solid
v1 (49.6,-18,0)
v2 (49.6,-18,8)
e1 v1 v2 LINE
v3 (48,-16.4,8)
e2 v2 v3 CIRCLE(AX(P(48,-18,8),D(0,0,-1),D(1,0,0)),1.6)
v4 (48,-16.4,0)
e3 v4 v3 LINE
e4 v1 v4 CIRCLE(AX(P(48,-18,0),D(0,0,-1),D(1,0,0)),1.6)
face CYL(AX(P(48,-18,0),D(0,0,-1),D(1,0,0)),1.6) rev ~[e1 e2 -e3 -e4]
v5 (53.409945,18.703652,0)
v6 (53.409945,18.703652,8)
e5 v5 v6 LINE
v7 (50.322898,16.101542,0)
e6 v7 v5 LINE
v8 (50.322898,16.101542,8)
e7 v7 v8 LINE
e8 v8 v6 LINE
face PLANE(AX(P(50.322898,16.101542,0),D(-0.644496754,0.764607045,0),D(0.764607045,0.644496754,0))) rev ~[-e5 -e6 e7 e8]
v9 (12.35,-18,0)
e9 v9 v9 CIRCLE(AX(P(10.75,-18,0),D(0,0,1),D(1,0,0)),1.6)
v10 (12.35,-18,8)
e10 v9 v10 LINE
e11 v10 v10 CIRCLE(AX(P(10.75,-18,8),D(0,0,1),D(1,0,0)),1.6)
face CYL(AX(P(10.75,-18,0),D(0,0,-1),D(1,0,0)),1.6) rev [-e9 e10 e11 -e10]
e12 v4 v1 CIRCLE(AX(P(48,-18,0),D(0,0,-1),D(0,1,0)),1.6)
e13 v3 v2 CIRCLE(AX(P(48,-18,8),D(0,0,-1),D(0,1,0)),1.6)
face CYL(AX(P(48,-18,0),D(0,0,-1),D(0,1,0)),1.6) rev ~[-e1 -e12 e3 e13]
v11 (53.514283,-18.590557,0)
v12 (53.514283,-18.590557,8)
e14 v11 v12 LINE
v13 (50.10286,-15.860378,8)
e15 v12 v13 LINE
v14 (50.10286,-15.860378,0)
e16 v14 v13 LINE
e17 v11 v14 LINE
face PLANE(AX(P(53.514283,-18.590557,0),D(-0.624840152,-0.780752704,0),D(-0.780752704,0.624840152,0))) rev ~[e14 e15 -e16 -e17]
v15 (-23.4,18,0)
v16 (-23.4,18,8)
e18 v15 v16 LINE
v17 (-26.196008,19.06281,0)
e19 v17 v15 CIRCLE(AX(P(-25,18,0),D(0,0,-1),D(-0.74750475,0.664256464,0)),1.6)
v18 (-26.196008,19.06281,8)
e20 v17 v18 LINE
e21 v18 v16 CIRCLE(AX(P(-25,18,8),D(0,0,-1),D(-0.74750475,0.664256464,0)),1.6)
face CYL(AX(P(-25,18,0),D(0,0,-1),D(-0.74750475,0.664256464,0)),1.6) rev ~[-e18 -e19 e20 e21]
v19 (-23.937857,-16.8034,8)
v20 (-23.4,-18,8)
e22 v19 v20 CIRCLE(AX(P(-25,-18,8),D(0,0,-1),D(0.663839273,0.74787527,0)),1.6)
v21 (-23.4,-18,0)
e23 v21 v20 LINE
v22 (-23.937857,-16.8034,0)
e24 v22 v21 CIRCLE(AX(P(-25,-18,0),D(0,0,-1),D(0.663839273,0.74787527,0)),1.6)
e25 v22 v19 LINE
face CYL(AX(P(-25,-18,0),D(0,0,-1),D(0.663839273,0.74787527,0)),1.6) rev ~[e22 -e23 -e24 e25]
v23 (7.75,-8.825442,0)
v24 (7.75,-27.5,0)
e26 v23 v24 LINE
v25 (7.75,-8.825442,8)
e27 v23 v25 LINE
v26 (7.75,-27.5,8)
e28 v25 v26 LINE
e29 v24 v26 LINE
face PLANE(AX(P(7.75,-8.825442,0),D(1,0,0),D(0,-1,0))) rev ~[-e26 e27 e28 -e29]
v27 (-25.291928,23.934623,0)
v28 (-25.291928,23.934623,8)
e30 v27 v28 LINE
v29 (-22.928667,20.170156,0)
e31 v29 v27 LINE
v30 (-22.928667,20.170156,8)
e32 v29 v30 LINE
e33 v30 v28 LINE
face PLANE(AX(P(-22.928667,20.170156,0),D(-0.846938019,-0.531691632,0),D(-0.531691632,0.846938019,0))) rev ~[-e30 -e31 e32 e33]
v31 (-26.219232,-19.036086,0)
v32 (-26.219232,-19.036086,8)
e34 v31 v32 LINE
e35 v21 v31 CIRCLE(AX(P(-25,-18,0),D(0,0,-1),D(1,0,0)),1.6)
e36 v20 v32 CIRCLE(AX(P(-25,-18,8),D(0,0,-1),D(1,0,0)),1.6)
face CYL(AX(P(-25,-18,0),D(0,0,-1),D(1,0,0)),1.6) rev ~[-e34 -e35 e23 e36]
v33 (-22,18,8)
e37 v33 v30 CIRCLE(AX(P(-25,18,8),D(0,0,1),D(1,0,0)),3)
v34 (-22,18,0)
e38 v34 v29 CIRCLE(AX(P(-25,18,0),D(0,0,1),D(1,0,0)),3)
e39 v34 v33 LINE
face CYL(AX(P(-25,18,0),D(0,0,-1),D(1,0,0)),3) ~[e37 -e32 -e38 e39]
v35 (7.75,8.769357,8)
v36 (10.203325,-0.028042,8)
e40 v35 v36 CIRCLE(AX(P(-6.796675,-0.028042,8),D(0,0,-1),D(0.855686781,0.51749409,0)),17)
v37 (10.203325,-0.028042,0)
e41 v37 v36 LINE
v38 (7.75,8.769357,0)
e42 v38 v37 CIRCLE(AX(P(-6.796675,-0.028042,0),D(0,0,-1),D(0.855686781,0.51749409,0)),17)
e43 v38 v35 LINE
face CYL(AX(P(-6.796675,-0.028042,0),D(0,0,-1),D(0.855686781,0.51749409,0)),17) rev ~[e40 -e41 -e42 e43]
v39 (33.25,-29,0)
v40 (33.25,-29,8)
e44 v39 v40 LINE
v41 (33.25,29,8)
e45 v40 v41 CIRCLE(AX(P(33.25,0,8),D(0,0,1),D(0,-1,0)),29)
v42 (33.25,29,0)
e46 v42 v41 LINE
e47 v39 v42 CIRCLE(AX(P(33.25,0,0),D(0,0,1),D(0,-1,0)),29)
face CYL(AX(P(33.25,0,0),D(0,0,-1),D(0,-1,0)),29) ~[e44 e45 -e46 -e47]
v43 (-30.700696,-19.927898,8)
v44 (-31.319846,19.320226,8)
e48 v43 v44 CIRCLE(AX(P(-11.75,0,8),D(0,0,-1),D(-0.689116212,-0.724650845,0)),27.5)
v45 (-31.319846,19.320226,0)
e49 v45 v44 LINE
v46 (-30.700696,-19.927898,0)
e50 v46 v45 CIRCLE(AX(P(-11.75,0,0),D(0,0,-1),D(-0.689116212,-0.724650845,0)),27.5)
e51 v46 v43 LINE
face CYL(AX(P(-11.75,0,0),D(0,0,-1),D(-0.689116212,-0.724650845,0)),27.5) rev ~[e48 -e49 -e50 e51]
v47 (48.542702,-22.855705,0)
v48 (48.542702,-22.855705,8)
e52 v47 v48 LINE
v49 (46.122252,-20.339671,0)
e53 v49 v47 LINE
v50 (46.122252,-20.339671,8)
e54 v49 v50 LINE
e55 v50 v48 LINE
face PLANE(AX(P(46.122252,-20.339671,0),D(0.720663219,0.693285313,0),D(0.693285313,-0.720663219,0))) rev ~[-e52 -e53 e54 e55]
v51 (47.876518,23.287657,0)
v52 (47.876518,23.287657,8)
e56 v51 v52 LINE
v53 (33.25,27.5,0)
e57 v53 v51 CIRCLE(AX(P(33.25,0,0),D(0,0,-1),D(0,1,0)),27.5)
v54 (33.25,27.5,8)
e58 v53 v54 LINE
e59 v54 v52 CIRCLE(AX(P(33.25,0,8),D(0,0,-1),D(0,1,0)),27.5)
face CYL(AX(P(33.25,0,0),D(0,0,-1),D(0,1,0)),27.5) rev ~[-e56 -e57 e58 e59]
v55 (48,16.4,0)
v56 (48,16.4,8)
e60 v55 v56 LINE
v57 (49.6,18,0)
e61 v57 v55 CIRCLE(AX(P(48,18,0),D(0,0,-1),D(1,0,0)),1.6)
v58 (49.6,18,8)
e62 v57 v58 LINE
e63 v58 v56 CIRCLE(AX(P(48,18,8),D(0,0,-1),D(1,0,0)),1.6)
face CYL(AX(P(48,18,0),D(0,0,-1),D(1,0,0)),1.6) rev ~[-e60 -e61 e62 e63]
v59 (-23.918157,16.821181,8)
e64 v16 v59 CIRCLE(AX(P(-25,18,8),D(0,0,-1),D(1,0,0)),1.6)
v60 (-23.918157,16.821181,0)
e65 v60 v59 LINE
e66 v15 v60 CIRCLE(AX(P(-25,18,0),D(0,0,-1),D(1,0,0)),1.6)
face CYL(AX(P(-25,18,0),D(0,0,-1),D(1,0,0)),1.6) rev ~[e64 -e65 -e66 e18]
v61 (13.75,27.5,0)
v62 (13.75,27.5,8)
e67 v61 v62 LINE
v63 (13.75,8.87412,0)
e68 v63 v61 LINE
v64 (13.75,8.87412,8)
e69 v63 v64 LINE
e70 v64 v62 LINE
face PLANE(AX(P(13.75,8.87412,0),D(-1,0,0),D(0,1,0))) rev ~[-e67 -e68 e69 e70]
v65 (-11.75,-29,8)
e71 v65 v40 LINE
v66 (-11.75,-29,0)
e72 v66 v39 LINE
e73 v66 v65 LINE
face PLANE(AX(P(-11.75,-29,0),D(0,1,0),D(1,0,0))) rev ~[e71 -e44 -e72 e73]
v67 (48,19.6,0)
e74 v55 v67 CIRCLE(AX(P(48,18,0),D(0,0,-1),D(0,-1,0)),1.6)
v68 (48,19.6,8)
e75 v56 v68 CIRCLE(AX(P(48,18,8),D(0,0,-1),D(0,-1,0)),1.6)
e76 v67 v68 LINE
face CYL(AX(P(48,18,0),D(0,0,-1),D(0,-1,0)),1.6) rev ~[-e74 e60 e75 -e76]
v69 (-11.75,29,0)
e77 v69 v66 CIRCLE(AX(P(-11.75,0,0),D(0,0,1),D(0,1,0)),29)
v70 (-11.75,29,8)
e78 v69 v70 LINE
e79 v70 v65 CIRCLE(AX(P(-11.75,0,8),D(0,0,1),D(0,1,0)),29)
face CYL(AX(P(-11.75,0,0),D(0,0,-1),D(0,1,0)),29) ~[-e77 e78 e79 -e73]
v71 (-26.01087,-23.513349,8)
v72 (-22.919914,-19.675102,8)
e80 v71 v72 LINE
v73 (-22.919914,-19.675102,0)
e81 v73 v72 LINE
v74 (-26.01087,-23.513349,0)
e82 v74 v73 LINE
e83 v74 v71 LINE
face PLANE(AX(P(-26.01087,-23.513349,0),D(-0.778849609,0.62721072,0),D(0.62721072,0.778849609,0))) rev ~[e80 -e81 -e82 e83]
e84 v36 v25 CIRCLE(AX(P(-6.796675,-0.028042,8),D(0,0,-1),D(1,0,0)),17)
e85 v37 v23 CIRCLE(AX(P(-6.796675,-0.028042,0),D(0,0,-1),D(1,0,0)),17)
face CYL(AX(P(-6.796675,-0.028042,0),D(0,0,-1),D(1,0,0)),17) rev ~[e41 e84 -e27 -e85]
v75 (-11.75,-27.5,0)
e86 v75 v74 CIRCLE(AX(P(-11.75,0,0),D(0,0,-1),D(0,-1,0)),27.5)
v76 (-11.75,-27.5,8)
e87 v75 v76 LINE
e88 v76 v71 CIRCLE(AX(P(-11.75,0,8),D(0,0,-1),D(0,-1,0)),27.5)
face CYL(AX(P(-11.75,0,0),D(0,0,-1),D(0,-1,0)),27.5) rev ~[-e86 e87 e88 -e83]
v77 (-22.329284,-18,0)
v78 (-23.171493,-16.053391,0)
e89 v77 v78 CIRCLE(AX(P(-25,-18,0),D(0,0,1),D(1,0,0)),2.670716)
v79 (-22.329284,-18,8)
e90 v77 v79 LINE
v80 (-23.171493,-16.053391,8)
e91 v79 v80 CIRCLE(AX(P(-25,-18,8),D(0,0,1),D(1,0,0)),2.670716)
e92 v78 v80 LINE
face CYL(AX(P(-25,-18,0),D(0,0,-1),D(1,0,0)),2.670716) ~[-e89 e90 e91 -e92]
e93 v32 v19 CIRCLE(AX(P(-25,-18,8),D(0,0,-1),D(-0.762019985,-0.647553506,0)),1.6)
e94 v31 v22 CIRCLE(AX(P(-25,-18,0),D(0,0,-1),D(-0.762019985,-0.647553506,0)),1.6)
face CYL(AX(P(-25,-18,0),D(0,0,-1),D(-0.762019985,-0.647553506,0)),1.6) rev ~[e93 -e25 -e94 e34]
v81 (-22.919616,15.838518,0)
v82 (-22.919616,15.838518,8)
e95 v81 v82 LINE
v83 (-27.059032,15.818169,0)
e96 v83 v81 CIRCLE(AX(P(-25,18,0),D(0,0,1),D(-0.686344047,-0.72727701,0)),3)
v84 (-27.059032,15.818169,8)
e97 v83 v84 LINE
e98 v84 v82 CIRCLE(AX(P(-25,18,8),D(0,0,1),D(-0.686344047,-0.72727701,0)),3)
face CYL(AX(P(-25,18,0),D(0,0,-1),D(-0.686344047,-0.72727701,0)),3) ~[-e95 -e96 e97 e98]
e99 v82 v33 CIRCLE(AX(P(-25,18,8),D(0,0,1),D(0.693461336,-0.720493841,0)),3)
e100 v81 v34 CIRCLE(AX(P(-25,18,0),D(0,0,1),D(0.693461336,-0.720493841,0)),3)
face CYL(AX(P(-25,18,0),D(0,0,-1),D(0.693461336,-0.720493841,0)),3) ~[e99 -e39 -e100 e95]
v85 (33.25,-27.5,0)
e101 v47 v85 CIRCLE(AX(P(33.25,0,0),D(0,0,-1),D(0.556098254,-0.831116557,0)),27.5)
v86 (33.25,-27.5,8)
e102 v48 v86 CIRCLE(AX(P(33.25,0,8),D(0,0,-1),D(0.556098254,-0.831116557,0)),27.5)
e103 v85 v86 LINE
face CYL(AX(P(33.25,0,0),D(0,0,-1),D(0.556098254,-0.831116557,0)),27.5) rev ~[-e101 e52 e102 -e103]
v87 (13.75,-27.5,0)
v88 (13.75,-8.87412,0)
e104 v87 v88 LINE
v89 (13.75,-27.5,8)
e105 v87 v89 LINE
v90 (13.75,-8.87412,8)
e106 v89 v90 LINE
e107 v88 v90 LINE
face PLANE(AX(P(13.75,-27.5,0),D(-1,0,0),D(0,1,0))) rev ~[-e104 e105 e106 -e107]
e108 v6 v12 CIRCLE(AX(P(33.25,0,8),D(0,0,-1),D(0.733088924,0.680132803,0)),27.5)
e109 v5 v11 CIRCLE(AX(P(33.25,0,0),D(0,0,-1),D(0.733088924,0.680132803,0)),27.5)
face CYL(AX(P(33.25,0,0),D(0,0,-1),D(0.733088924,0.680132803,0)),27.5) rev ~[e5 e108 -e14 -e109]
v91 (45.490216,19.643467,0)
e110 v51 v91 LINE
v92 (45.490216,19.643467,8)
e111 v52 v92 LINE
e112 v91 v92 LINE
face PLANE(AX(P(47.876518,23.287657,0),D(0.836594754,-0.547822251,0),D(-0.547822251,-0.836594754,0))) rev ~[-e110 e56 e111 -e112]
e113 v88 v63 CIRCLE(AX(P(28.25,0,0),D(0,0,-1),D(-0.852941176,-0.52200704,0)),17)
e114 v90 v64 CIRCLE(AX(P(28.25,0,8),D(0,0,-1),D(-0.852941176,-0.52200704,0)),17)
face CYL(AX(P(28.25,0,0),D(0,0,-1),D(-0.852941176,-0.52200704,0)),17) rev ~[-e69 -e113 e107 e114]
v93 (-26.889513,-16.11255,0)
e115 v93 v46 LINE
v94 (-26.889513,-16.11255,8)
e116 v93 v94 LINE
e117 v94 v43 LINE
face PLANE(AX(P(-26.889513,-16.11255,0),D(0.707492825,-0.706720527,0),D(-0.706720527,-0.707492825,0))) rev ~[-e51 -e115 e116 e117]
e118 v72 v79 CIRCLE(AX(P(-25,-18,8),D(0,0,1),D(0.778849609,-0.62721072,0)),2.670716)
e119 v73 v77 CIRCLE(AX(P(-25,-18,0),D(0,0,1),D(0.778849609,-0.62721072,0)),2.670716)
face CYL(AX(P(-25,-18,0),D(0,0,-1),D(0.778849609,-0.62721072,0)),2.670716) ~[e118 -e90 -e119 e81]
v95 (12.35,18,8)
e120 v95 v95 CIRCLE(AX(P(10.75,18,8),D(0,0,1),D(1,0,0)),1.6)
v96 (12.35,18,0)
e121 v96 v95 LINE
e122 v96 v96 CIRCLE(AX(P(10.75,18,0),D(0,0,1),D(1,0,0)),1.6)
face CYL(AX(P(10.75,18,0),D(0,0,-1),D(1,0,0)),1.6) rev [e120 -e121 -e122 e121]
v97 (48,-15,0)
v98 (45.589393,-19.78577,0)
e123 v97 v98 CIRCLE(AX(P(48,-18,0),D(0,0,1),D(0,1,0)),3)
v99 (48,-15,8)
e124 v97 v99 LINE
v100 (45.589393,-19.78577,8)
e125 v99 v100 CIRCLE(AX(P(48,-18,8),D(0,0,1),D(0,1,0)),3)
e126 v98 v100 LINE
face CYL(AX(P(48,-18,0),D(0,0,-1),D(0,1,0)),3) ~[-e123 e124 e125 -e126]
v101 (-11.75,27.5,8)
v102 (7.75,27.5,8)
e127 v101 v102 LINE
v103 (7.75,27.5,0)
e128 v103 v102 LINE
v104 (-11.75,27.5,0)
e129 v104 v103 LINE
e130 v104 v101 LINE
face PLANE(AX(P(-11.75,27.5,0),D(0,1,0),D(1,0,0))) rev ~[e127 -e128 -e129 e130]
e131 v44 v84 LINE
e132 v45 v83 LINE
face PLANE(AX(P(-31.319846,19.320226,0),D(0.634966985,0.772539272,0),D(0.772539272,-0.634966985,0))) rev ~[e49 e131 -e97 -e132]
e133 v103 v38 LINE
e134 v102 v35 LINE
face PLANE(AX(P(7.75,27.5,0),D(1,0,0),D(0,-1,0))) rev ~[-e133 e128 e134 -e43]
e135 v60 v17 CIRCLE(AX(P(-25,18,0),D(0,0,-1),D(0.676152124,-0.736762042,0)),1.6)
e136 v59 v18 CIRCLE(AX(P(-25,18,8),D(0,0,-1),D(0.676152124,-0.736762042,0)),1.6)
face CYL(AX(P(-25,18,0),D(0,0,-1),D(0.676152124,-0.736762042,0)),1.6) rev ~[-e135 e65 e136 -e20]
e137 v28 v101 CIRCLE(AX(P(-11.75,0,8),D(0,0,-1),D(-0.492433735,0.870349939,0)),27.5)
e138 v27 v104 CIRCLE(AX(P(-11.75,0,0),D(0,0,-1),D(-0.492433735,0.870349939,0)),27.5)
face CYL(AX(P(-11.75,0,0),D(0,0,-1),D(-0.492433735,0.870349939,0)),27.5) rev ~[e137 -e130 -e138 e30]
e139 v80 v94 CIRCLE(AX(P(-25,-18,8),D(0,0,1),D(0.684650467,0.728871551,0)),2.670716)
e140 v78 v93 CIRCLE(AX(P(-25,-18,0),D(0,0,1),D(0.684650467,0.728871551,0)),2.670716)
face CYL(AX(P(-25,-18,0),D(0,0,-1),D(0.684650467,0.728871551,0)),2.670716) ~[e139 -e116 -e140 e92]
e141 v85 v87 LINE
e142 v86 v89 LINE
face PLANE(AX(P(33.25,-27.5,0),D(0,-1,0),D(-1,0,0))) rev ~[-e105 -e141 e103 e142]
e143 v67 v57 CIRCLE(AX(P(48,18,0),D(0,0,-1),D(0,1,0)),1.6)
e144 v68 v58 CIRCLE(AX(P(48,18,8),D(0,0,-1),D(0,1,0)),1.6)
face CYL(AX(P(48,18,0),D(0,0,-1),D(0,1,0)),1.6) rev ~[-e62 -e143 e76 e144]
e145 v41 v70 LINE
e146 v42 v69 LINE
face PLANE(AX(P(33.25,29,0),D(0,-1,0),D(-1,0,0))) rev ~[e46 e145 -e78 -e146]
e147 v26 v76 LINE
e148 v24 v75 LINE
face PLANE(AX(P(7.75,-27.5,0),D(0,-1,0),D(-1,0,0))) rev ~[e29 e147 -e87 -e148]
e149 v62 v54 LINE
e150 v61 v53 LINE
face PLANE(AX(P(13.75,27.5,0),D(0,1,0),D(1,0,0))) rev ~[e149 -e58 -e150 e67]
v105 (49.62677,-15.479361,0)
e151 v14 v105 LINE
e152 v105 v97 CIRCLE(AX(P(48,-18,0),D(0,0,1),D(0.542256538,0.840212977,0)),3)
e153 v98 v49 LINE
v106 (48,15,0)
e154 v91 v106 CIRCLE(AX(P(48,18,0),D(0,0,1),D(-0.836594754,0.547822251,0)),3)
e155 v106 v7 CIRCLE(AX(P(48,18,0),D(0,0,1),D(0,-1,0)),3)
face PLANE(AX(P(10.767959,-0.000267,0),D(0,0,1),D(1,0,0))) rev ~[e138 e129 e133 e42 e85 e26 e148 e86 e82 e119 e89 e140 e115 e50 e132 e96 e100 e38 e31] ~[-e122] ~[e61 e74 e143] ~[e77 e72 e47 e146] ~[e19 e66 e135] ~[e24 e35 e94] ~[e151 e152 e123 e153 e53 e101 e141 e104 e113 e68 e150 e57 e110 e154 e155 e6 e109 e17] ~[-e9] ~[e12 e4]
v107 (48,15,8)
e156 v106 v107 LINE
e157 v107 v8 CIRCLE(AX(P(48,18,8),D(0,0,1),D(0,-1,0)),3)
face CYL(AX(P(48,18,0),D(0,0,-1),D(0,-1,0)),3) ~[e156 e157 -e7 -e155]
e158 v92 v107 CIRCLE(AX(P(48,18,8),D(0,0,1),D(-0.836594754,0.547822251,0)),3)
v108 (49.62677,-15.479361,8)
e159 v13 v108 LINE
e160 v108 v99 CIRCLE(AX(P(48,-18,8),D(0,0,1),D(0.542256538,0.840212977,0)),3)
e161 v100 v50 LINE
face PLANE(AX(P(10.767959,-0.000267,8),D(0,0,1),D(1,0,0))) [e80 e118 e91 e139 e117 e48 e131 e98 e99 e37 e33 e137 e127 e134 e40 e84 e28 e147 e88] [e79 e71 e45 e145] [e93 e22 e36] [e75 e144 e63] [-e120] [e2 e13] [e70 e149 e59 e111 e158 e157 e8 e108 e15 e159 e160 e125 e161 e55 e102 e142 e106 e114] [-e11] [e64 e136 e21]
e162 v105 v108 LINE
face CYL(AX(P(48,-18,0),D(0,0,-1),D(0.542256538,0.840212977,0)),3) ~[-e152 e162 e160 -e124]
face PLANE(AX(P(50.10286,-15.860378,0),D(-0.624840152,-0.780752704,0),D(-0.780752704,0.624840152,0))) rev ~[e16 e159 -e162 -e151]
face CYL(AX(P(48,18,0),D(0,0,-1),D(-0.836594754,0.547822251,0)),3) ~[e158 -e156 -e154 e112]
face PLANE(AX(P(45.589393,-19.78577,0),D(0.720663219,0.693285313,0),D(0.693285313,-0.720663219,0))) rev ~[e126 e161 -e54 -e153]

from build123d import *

# Parameters (mm, degrees)
F0_R     = 1.6
F1_DEPTH = 8


with BuildPart() as f1:
    # F0 (on Top) → F1 (new body)
    with BuildSketch(Plane.XY):
        with BuildLine():
            ThreePointArc((7.75, 8.769357237), (9.5785114413, 4.5384947039), (10.2033247314, -0.028042301))
            ThreePointArc((10.2033247314, -0.028042301), (9.5785114413, -4.5945793059), (7.75, -8.825441839))
            Line((7.75, -8.825441839), (7.75, -18.0000000146))
            ThreePointArc((7.75, -18.0000000146), (10.7499999927, -15), (13.75, -18))
            Line((13.75, -18), (13.75, -8.8741196746))
            ThreePointArc((13.75, -8.8741196746), (11.25, 0), (13.75, 8.8741196746))
            Line((13.75, 8.8741196746), (13.75, 18))
            ThreePointArc((13.75, 18), (10.75, 15), (7.75, 18))
            Line((7.75, 18), (7.75, 8.769357237))
        make_face()
        with BuildLine():
            Line((7.75, 27.5), (7.75, 18))
            ThreePointArc((7.75, 18), (10.75, 21), (13.75, 18))
            Line((13.75, 18), (13.75, 27.5))
            Line((13.75, 27.5), (7.75, 27.5))
        make_face()
        with BuildLine():
            ThreePointArc((13.75, 18), (10.75, 21), (7.75, 18))
            ThreePointArc((7.75, 18), (10.75, 15), (13.75, 18))
        make_face()
        with Locations((10.75, 18)):
            Circle(F0_R, mode=Mode.SUBTRACT)
        with BuildLine():
            ThreePointArc((13.75, -18), (10.7499999927, -15), (7.75, -18.0000000146))
            ThreePointArc((7.75, -18.0000000146), (10.7500000073, -21), (13.75, -18))
        make_face()
        with Locations((10.75, -18)):
            Circle(F0_R, mode=Mode.SUBTRACT)
        with BuildLine():
            ThreePointArc((13.75, -18), (10.7500000073, -21), (7.75, -18.0000000146))
            Line((7.75, -18.0000000146), (7.75, -27.5))
            Line((7.75, -27.5), (13.75, -27.5))
            Line((13.75, -27.5), (13.75, -18))
        make_face()
        with BuildLine():
            ThreePointArc((-25.2919277241, 23.9346233209), (-18.7517090297, 26.593722392), (-11.75, 27.5))
            Line((-11.75, 27.5), (-11.75, 29))
            ThreePointArc((-11.75, 29), (-40.75, 0), (-11.75, -29))
            Line((-11.75, -29), (-11.75, -27.5))
            ThreePointArc((-11.75, -27.5), (-19.1538130954, -26.4845908341), (-26.0108698504, -23.5133492108))
            ThreePointArc((-26.0108698504, -23.5133492108), (-27.4397291664, -22.5850038451), (-28.8083510414, -21.5699480701))
            ThreePointArc((-28.8083510414, -21.5699480701), (-29.7732335043, -20.7704851664), (-30.7006958236, -19.9278982284))
            ThreePointArc((-30.7006958236, -19.9278982284), (-39.2465788178, -0.4337664292), (-31.3198462511, 19.3202256122))
            ThreePointArc((-31.3198462511, 19.3202256122), (-30.0815714824, 20.4988655048), (-28.77245464, 21.5982878495))
            ThreePointArc((-28.77245464, 21.5982878495), (-27.0767734107, 22.8328714098), (-25.2919277241, 23.9346233209))
        make_face()
        Polygon((-11.75, 29), (-11.75, 27.5), (7.75, 27.5), (13.75, 27.5), (33.25, 27.5), (33.25, 29), align=None)
        Polygon((7.75, -27.5), (-11.75, -27.5), (-11.75, -29), (33.25, -29), (33.25, -27.5), (13.75, -27.5), align=None)
        with BuildLine():
            Line((-23.9181566023, 16.8211807336), (-22.9196159905, 15.8385184773))
            ThreePointArc((-22.9196159905, 15.8385184773), (-22.2394609196, 16.8255111811), (-22, 18))
            ThreePointArc((-22, 18), (-22.2419209631, 19.180254221), (-22.9286666841, 20.1701562834))
            ThreePointArc((-22.9286666841, 20.1701562834), (-25.0876469222, 20.9987193962), (-27.1945482113, 20.0454725978))
            Line((-27.1945482113, 20.0454725978), (-26.1960075994, 19.0628103416))
            ThreePointArc((-26.1960075994, 19.0628103416), (-24.4314985308, 19.4955955601), (-23.4, 18))
            ThreePointArc((-23.4, 18), (-23.5352560913, 17.3561636218), (-23.9181566023, 16.8211807336))
        make_face()
        with BuildLine():
            ThreePointArc((-27.0590321397, 15.818168969), (-24.9852520778, 15.0000362504), (-22.9196159905, 15.8385184773))
            Line((-22.9196159905, 15.8385184773), (-23.9181566023, 16.8211807336))
            ThreePointArc((-23.9181566023, 16.8211807336), (-26.122267433, 16.8595984002), (-26.1960075994, 19.0628103416))
            Line((-26.1960075994, 19.0628103416), (-27.1945482113, 20.0454725978))
            ThreePointArc((-27.1945482113, 20.0454725978), (-27.9984596784, 17.9038773857), (-27.0590321397, 15.818168969))
        make_face()
        with BuildLine():
            Line((-22.9286666841, 20.1701562834), (-25.2919277241, 23.9346233209))
            ThreePointArc((-25.2919277241, 23.9346233209), (-27.0767734107, 22.8328714098), (-28.77245464, 21.5982878495))
            Line((-28.77245464, 21.5982878495), (-27.1945482113, 20.0454725978))
            ThreePointArc((-27.1945482113, 20.0454725978), (-25.0876469222, 20.9987193962), (-22.9286666841, 20.1701562834))
        make_face()
        with BuildLine():
            ThreePointArc((-22.3292838603, -18), (-22.5488627131, -16.9395045028), (-23.1714929463, -16.053390986))
            Line((-23.1714929463, -16.053390986), (-23.9378571629, -16.8033995681))
            ThreePointArc((-23.9378571629, -16.8033995681), (-23.5406459409, -17.3440383164), (-23.4, -18))
            ThreePointArc((-23.4, -18), (-24.4480811477, -19.5017941205), (-26.2192319756, -19.0360856093))
            Line((-26.2192319756, -19.0360856093), (-26.9855961921, -19.7860941914))
            ThreePointArc((-26.9855961921, -19.7860941914), (-24.9271170835, -20.6697214797), (-22.9199137797, -19.6751017924))
            ThreePointArc((-22.9199137797, -19.6751017924), (-22.4812657406, -18.8880892011), (-22.3292838603, -18))
        make_face()
        with BuildLine():
            Line((-23.9378571629, -16.8033995681), (-23.1714929463, -16.053390986))
            ThreePointArc((-23.1714929463, -16.053390986), (-25.0424895986, -15.3296218746), (-26.8895125058, -16.1125500829))
            ThreePointArc((-26.8895125058, -16.1125500829), (-27.6698030703, -17.9301697453), (-26.9855961921, -19.7860941914))
            Line((-26.9855961921, -19.7860941914), (-26.2192319756, -19.0360856093))
            ThreePointArc((-26.2192319756, -19.0360856093), (-26.1191027607, -16.8564926712), (-23.9378571629, -16.8033995681))
        make_face()
        with BuildLine():
            ThreePointArc((-28.8083510414, -21.5699480701), (-27.4397291664, -22.5850038451), (-26.0108698504, -23.5133492108))
            Line((-26.0108698504, -23.5133492108), (-22.9199137797, -19.6751017924))
            ThreePointArc((-22.9199137797, -19.6751017924), (-24.9271170835, -20.6697214797), (-26.9855961921, -19.7860941914))
            Line((-26.9855961921, -19.7860941914), (-28.8083510414, -21.5699480701))
        make_face()
        with BuildLine():
            Line((-31.3198462511, 19.3202256122), (-27.0590321397, 15.818168969))
            ThreePointArc((-27.0590321397, 15.818168969), (-27.9984596784, 17.9038773857), (-27.1945482113, 20.0454725978))
            Line((-27.1945482113, 20.0454725978), (-28.77245464, 21.5982878495))
            ThreePointArc((-28.77245464, 21.5982878495), (-30.0815714824, 20.4988655048), (-31.3198462511, 19.3202256122))
        make_face()
        with BuildLine():
            ThreePointArc((33.25, -29), (62.25, 0), (33.25, 29))
            Line((33.25, 29), (33.25, 27.5))
            ThreePointArc((33.25, 27.5), (40.8605006229, 26.4259395343), (47.8765184935, 23.2876567468))
            ThreePointArc((47.8765184935, 23.2876567468), (50.7935969105, 21.177162403), (53.4099454165, 18.7036520713))
            ThreePointArc((53.4099454165, 18.7036520713), (60.7498923776, 0.0769364868), (53.514283477, -18.5905571505))
            ThreePointArc((53.514283477, -18.5905571505), (51.1559396917, -20.8716871325), (48.5427019981, -22.8557053183))
            ThreePointArc((48.5427019981, -22.8557053183), (41.2411858865, -26.3133226356), (33.25, -27.5))
            Line((33.25, -27.5), (33.25, -29))
        make_face()
        with BuildLine():
            ThreePointArc((-26.9855961921, -19.7860941914), (-27.6698030703, -17.9301697453), (-26.8895125058, -16.1125500829))
            Line((-26.8895125058, -16.1125500829), (-30.7006958236, -19.9278982284))
            ThreePointArc((-30.7006958236, -19.9278982284), (-29.7732335043, -20.7704851664), (-28.8083510414, -21.5699480701))
            Line((-28.8083510414, -21.5699480701), (-26.9855961921, -19.7860941914))
        make_face()
        with BuildLine():
            ThreePointArc((53.4099454165, 18.7036520713), (50.7935969105, 21.177162403), (47.8765184935, 23.2876567468))
            Line((47.8765184935, 23.2876567468), (45.4902157392, 19.6434667518))
            ThreePointArc((45.4902157392, 19.6434667518), (48.8575101217, 20.8748350198), (51, 18))
            ThreePointArc((51, 18), (50.8256587545, 16.9922040865), (50.3228982644, 16.1015417695))
            Line((50.3228982644, 16.1015417695), (53.4099454165, 18.7036520713))
        make_face()
        with BuildLine():
            Line((46.1222517122, -20.3396712093), (48.5427019981, -22.8557053183))
            ThreePointArc((48.5427019981, -22.8557053183), (51.1559396917, -20.8716871325), (53.514283477, -18.5905571505))
            Line((53.514283477, -18.5905571505), (50.1028595569, -15.8603781447))
            ThreePointArc((50.1028595569, -15.8603781447), (50.7666386348, -16.8399523007), (51, -18))
            ThreePointArc((51, -18), (49.2974504107, -20.7049255871), (46.1222517122, -20.3396712093))
        make_face()
        with BuildLine():
            ThreePointArc((51, 18), (48.8575101217, 20.8748350198), (45.4902157392, 19.6434667518))
            ThreePointArc((45.4902157392, 19.6434667518), (45.3608334407, 16.5735358847), (48, 15))
            ThreePointArc((48, 15), (49.2854231421, 15.2893382089), (50.3228982644, 16.1015417695))
            ThreePointArc((50.3228982644, 16.1015417695), (50.8256587545, 16.9922040865), (51, 18))
        make_face()
        with BuildLine():
            ThreePointArc((49.6, 18), (49.1313708499, 16.8686291501), (48, 16.4))
            ThreePointArc((48, 16.4), (46.4, 18), (48, 19.6))
            ThreePointArc((48, 19.6), (49.1313708499, 19.1313708499), (49.6, 18))
        make_face(mode=Mode.SUBTRACT)
        with BuildLine():
            Line((45.5893930702, -19.7857699264), (46.1222517122, -20.3396712093))
            ThreePointArc((46.1222517122, -20.3396712093), (49.2974504107, -20.7049255871), (51, -18))
            ThreePointArc((51, -18), (50.7666386348, -16.8399523007), (50.1028595569, -15.8603781447))
            Line((50.1028595569, -15.8603781447), (49.6267696131, -15.4793610679))
            ThreePointArc((49.6267696131, -15.4793610679), (48.8479632079, -15.1223345576), (48, -15))
            ThreePointArc((48, -15), (45.3206988057, -16.6504278047), (45.5893930702, -19.7857699264))
        make_face()
        with BuildLine():
            ThreePointArc((49.6, -18), (46.8686291501, -19.1313708499), (48, -16.4))
            ThreePointArc((48, -16.4), (49.1313708499, -16.8686291501), (49.6, -18))
        make_face(mode=Mode.SUBTRACT)
    extrude(amount=F1_DEPTH)


solid = f1.part
